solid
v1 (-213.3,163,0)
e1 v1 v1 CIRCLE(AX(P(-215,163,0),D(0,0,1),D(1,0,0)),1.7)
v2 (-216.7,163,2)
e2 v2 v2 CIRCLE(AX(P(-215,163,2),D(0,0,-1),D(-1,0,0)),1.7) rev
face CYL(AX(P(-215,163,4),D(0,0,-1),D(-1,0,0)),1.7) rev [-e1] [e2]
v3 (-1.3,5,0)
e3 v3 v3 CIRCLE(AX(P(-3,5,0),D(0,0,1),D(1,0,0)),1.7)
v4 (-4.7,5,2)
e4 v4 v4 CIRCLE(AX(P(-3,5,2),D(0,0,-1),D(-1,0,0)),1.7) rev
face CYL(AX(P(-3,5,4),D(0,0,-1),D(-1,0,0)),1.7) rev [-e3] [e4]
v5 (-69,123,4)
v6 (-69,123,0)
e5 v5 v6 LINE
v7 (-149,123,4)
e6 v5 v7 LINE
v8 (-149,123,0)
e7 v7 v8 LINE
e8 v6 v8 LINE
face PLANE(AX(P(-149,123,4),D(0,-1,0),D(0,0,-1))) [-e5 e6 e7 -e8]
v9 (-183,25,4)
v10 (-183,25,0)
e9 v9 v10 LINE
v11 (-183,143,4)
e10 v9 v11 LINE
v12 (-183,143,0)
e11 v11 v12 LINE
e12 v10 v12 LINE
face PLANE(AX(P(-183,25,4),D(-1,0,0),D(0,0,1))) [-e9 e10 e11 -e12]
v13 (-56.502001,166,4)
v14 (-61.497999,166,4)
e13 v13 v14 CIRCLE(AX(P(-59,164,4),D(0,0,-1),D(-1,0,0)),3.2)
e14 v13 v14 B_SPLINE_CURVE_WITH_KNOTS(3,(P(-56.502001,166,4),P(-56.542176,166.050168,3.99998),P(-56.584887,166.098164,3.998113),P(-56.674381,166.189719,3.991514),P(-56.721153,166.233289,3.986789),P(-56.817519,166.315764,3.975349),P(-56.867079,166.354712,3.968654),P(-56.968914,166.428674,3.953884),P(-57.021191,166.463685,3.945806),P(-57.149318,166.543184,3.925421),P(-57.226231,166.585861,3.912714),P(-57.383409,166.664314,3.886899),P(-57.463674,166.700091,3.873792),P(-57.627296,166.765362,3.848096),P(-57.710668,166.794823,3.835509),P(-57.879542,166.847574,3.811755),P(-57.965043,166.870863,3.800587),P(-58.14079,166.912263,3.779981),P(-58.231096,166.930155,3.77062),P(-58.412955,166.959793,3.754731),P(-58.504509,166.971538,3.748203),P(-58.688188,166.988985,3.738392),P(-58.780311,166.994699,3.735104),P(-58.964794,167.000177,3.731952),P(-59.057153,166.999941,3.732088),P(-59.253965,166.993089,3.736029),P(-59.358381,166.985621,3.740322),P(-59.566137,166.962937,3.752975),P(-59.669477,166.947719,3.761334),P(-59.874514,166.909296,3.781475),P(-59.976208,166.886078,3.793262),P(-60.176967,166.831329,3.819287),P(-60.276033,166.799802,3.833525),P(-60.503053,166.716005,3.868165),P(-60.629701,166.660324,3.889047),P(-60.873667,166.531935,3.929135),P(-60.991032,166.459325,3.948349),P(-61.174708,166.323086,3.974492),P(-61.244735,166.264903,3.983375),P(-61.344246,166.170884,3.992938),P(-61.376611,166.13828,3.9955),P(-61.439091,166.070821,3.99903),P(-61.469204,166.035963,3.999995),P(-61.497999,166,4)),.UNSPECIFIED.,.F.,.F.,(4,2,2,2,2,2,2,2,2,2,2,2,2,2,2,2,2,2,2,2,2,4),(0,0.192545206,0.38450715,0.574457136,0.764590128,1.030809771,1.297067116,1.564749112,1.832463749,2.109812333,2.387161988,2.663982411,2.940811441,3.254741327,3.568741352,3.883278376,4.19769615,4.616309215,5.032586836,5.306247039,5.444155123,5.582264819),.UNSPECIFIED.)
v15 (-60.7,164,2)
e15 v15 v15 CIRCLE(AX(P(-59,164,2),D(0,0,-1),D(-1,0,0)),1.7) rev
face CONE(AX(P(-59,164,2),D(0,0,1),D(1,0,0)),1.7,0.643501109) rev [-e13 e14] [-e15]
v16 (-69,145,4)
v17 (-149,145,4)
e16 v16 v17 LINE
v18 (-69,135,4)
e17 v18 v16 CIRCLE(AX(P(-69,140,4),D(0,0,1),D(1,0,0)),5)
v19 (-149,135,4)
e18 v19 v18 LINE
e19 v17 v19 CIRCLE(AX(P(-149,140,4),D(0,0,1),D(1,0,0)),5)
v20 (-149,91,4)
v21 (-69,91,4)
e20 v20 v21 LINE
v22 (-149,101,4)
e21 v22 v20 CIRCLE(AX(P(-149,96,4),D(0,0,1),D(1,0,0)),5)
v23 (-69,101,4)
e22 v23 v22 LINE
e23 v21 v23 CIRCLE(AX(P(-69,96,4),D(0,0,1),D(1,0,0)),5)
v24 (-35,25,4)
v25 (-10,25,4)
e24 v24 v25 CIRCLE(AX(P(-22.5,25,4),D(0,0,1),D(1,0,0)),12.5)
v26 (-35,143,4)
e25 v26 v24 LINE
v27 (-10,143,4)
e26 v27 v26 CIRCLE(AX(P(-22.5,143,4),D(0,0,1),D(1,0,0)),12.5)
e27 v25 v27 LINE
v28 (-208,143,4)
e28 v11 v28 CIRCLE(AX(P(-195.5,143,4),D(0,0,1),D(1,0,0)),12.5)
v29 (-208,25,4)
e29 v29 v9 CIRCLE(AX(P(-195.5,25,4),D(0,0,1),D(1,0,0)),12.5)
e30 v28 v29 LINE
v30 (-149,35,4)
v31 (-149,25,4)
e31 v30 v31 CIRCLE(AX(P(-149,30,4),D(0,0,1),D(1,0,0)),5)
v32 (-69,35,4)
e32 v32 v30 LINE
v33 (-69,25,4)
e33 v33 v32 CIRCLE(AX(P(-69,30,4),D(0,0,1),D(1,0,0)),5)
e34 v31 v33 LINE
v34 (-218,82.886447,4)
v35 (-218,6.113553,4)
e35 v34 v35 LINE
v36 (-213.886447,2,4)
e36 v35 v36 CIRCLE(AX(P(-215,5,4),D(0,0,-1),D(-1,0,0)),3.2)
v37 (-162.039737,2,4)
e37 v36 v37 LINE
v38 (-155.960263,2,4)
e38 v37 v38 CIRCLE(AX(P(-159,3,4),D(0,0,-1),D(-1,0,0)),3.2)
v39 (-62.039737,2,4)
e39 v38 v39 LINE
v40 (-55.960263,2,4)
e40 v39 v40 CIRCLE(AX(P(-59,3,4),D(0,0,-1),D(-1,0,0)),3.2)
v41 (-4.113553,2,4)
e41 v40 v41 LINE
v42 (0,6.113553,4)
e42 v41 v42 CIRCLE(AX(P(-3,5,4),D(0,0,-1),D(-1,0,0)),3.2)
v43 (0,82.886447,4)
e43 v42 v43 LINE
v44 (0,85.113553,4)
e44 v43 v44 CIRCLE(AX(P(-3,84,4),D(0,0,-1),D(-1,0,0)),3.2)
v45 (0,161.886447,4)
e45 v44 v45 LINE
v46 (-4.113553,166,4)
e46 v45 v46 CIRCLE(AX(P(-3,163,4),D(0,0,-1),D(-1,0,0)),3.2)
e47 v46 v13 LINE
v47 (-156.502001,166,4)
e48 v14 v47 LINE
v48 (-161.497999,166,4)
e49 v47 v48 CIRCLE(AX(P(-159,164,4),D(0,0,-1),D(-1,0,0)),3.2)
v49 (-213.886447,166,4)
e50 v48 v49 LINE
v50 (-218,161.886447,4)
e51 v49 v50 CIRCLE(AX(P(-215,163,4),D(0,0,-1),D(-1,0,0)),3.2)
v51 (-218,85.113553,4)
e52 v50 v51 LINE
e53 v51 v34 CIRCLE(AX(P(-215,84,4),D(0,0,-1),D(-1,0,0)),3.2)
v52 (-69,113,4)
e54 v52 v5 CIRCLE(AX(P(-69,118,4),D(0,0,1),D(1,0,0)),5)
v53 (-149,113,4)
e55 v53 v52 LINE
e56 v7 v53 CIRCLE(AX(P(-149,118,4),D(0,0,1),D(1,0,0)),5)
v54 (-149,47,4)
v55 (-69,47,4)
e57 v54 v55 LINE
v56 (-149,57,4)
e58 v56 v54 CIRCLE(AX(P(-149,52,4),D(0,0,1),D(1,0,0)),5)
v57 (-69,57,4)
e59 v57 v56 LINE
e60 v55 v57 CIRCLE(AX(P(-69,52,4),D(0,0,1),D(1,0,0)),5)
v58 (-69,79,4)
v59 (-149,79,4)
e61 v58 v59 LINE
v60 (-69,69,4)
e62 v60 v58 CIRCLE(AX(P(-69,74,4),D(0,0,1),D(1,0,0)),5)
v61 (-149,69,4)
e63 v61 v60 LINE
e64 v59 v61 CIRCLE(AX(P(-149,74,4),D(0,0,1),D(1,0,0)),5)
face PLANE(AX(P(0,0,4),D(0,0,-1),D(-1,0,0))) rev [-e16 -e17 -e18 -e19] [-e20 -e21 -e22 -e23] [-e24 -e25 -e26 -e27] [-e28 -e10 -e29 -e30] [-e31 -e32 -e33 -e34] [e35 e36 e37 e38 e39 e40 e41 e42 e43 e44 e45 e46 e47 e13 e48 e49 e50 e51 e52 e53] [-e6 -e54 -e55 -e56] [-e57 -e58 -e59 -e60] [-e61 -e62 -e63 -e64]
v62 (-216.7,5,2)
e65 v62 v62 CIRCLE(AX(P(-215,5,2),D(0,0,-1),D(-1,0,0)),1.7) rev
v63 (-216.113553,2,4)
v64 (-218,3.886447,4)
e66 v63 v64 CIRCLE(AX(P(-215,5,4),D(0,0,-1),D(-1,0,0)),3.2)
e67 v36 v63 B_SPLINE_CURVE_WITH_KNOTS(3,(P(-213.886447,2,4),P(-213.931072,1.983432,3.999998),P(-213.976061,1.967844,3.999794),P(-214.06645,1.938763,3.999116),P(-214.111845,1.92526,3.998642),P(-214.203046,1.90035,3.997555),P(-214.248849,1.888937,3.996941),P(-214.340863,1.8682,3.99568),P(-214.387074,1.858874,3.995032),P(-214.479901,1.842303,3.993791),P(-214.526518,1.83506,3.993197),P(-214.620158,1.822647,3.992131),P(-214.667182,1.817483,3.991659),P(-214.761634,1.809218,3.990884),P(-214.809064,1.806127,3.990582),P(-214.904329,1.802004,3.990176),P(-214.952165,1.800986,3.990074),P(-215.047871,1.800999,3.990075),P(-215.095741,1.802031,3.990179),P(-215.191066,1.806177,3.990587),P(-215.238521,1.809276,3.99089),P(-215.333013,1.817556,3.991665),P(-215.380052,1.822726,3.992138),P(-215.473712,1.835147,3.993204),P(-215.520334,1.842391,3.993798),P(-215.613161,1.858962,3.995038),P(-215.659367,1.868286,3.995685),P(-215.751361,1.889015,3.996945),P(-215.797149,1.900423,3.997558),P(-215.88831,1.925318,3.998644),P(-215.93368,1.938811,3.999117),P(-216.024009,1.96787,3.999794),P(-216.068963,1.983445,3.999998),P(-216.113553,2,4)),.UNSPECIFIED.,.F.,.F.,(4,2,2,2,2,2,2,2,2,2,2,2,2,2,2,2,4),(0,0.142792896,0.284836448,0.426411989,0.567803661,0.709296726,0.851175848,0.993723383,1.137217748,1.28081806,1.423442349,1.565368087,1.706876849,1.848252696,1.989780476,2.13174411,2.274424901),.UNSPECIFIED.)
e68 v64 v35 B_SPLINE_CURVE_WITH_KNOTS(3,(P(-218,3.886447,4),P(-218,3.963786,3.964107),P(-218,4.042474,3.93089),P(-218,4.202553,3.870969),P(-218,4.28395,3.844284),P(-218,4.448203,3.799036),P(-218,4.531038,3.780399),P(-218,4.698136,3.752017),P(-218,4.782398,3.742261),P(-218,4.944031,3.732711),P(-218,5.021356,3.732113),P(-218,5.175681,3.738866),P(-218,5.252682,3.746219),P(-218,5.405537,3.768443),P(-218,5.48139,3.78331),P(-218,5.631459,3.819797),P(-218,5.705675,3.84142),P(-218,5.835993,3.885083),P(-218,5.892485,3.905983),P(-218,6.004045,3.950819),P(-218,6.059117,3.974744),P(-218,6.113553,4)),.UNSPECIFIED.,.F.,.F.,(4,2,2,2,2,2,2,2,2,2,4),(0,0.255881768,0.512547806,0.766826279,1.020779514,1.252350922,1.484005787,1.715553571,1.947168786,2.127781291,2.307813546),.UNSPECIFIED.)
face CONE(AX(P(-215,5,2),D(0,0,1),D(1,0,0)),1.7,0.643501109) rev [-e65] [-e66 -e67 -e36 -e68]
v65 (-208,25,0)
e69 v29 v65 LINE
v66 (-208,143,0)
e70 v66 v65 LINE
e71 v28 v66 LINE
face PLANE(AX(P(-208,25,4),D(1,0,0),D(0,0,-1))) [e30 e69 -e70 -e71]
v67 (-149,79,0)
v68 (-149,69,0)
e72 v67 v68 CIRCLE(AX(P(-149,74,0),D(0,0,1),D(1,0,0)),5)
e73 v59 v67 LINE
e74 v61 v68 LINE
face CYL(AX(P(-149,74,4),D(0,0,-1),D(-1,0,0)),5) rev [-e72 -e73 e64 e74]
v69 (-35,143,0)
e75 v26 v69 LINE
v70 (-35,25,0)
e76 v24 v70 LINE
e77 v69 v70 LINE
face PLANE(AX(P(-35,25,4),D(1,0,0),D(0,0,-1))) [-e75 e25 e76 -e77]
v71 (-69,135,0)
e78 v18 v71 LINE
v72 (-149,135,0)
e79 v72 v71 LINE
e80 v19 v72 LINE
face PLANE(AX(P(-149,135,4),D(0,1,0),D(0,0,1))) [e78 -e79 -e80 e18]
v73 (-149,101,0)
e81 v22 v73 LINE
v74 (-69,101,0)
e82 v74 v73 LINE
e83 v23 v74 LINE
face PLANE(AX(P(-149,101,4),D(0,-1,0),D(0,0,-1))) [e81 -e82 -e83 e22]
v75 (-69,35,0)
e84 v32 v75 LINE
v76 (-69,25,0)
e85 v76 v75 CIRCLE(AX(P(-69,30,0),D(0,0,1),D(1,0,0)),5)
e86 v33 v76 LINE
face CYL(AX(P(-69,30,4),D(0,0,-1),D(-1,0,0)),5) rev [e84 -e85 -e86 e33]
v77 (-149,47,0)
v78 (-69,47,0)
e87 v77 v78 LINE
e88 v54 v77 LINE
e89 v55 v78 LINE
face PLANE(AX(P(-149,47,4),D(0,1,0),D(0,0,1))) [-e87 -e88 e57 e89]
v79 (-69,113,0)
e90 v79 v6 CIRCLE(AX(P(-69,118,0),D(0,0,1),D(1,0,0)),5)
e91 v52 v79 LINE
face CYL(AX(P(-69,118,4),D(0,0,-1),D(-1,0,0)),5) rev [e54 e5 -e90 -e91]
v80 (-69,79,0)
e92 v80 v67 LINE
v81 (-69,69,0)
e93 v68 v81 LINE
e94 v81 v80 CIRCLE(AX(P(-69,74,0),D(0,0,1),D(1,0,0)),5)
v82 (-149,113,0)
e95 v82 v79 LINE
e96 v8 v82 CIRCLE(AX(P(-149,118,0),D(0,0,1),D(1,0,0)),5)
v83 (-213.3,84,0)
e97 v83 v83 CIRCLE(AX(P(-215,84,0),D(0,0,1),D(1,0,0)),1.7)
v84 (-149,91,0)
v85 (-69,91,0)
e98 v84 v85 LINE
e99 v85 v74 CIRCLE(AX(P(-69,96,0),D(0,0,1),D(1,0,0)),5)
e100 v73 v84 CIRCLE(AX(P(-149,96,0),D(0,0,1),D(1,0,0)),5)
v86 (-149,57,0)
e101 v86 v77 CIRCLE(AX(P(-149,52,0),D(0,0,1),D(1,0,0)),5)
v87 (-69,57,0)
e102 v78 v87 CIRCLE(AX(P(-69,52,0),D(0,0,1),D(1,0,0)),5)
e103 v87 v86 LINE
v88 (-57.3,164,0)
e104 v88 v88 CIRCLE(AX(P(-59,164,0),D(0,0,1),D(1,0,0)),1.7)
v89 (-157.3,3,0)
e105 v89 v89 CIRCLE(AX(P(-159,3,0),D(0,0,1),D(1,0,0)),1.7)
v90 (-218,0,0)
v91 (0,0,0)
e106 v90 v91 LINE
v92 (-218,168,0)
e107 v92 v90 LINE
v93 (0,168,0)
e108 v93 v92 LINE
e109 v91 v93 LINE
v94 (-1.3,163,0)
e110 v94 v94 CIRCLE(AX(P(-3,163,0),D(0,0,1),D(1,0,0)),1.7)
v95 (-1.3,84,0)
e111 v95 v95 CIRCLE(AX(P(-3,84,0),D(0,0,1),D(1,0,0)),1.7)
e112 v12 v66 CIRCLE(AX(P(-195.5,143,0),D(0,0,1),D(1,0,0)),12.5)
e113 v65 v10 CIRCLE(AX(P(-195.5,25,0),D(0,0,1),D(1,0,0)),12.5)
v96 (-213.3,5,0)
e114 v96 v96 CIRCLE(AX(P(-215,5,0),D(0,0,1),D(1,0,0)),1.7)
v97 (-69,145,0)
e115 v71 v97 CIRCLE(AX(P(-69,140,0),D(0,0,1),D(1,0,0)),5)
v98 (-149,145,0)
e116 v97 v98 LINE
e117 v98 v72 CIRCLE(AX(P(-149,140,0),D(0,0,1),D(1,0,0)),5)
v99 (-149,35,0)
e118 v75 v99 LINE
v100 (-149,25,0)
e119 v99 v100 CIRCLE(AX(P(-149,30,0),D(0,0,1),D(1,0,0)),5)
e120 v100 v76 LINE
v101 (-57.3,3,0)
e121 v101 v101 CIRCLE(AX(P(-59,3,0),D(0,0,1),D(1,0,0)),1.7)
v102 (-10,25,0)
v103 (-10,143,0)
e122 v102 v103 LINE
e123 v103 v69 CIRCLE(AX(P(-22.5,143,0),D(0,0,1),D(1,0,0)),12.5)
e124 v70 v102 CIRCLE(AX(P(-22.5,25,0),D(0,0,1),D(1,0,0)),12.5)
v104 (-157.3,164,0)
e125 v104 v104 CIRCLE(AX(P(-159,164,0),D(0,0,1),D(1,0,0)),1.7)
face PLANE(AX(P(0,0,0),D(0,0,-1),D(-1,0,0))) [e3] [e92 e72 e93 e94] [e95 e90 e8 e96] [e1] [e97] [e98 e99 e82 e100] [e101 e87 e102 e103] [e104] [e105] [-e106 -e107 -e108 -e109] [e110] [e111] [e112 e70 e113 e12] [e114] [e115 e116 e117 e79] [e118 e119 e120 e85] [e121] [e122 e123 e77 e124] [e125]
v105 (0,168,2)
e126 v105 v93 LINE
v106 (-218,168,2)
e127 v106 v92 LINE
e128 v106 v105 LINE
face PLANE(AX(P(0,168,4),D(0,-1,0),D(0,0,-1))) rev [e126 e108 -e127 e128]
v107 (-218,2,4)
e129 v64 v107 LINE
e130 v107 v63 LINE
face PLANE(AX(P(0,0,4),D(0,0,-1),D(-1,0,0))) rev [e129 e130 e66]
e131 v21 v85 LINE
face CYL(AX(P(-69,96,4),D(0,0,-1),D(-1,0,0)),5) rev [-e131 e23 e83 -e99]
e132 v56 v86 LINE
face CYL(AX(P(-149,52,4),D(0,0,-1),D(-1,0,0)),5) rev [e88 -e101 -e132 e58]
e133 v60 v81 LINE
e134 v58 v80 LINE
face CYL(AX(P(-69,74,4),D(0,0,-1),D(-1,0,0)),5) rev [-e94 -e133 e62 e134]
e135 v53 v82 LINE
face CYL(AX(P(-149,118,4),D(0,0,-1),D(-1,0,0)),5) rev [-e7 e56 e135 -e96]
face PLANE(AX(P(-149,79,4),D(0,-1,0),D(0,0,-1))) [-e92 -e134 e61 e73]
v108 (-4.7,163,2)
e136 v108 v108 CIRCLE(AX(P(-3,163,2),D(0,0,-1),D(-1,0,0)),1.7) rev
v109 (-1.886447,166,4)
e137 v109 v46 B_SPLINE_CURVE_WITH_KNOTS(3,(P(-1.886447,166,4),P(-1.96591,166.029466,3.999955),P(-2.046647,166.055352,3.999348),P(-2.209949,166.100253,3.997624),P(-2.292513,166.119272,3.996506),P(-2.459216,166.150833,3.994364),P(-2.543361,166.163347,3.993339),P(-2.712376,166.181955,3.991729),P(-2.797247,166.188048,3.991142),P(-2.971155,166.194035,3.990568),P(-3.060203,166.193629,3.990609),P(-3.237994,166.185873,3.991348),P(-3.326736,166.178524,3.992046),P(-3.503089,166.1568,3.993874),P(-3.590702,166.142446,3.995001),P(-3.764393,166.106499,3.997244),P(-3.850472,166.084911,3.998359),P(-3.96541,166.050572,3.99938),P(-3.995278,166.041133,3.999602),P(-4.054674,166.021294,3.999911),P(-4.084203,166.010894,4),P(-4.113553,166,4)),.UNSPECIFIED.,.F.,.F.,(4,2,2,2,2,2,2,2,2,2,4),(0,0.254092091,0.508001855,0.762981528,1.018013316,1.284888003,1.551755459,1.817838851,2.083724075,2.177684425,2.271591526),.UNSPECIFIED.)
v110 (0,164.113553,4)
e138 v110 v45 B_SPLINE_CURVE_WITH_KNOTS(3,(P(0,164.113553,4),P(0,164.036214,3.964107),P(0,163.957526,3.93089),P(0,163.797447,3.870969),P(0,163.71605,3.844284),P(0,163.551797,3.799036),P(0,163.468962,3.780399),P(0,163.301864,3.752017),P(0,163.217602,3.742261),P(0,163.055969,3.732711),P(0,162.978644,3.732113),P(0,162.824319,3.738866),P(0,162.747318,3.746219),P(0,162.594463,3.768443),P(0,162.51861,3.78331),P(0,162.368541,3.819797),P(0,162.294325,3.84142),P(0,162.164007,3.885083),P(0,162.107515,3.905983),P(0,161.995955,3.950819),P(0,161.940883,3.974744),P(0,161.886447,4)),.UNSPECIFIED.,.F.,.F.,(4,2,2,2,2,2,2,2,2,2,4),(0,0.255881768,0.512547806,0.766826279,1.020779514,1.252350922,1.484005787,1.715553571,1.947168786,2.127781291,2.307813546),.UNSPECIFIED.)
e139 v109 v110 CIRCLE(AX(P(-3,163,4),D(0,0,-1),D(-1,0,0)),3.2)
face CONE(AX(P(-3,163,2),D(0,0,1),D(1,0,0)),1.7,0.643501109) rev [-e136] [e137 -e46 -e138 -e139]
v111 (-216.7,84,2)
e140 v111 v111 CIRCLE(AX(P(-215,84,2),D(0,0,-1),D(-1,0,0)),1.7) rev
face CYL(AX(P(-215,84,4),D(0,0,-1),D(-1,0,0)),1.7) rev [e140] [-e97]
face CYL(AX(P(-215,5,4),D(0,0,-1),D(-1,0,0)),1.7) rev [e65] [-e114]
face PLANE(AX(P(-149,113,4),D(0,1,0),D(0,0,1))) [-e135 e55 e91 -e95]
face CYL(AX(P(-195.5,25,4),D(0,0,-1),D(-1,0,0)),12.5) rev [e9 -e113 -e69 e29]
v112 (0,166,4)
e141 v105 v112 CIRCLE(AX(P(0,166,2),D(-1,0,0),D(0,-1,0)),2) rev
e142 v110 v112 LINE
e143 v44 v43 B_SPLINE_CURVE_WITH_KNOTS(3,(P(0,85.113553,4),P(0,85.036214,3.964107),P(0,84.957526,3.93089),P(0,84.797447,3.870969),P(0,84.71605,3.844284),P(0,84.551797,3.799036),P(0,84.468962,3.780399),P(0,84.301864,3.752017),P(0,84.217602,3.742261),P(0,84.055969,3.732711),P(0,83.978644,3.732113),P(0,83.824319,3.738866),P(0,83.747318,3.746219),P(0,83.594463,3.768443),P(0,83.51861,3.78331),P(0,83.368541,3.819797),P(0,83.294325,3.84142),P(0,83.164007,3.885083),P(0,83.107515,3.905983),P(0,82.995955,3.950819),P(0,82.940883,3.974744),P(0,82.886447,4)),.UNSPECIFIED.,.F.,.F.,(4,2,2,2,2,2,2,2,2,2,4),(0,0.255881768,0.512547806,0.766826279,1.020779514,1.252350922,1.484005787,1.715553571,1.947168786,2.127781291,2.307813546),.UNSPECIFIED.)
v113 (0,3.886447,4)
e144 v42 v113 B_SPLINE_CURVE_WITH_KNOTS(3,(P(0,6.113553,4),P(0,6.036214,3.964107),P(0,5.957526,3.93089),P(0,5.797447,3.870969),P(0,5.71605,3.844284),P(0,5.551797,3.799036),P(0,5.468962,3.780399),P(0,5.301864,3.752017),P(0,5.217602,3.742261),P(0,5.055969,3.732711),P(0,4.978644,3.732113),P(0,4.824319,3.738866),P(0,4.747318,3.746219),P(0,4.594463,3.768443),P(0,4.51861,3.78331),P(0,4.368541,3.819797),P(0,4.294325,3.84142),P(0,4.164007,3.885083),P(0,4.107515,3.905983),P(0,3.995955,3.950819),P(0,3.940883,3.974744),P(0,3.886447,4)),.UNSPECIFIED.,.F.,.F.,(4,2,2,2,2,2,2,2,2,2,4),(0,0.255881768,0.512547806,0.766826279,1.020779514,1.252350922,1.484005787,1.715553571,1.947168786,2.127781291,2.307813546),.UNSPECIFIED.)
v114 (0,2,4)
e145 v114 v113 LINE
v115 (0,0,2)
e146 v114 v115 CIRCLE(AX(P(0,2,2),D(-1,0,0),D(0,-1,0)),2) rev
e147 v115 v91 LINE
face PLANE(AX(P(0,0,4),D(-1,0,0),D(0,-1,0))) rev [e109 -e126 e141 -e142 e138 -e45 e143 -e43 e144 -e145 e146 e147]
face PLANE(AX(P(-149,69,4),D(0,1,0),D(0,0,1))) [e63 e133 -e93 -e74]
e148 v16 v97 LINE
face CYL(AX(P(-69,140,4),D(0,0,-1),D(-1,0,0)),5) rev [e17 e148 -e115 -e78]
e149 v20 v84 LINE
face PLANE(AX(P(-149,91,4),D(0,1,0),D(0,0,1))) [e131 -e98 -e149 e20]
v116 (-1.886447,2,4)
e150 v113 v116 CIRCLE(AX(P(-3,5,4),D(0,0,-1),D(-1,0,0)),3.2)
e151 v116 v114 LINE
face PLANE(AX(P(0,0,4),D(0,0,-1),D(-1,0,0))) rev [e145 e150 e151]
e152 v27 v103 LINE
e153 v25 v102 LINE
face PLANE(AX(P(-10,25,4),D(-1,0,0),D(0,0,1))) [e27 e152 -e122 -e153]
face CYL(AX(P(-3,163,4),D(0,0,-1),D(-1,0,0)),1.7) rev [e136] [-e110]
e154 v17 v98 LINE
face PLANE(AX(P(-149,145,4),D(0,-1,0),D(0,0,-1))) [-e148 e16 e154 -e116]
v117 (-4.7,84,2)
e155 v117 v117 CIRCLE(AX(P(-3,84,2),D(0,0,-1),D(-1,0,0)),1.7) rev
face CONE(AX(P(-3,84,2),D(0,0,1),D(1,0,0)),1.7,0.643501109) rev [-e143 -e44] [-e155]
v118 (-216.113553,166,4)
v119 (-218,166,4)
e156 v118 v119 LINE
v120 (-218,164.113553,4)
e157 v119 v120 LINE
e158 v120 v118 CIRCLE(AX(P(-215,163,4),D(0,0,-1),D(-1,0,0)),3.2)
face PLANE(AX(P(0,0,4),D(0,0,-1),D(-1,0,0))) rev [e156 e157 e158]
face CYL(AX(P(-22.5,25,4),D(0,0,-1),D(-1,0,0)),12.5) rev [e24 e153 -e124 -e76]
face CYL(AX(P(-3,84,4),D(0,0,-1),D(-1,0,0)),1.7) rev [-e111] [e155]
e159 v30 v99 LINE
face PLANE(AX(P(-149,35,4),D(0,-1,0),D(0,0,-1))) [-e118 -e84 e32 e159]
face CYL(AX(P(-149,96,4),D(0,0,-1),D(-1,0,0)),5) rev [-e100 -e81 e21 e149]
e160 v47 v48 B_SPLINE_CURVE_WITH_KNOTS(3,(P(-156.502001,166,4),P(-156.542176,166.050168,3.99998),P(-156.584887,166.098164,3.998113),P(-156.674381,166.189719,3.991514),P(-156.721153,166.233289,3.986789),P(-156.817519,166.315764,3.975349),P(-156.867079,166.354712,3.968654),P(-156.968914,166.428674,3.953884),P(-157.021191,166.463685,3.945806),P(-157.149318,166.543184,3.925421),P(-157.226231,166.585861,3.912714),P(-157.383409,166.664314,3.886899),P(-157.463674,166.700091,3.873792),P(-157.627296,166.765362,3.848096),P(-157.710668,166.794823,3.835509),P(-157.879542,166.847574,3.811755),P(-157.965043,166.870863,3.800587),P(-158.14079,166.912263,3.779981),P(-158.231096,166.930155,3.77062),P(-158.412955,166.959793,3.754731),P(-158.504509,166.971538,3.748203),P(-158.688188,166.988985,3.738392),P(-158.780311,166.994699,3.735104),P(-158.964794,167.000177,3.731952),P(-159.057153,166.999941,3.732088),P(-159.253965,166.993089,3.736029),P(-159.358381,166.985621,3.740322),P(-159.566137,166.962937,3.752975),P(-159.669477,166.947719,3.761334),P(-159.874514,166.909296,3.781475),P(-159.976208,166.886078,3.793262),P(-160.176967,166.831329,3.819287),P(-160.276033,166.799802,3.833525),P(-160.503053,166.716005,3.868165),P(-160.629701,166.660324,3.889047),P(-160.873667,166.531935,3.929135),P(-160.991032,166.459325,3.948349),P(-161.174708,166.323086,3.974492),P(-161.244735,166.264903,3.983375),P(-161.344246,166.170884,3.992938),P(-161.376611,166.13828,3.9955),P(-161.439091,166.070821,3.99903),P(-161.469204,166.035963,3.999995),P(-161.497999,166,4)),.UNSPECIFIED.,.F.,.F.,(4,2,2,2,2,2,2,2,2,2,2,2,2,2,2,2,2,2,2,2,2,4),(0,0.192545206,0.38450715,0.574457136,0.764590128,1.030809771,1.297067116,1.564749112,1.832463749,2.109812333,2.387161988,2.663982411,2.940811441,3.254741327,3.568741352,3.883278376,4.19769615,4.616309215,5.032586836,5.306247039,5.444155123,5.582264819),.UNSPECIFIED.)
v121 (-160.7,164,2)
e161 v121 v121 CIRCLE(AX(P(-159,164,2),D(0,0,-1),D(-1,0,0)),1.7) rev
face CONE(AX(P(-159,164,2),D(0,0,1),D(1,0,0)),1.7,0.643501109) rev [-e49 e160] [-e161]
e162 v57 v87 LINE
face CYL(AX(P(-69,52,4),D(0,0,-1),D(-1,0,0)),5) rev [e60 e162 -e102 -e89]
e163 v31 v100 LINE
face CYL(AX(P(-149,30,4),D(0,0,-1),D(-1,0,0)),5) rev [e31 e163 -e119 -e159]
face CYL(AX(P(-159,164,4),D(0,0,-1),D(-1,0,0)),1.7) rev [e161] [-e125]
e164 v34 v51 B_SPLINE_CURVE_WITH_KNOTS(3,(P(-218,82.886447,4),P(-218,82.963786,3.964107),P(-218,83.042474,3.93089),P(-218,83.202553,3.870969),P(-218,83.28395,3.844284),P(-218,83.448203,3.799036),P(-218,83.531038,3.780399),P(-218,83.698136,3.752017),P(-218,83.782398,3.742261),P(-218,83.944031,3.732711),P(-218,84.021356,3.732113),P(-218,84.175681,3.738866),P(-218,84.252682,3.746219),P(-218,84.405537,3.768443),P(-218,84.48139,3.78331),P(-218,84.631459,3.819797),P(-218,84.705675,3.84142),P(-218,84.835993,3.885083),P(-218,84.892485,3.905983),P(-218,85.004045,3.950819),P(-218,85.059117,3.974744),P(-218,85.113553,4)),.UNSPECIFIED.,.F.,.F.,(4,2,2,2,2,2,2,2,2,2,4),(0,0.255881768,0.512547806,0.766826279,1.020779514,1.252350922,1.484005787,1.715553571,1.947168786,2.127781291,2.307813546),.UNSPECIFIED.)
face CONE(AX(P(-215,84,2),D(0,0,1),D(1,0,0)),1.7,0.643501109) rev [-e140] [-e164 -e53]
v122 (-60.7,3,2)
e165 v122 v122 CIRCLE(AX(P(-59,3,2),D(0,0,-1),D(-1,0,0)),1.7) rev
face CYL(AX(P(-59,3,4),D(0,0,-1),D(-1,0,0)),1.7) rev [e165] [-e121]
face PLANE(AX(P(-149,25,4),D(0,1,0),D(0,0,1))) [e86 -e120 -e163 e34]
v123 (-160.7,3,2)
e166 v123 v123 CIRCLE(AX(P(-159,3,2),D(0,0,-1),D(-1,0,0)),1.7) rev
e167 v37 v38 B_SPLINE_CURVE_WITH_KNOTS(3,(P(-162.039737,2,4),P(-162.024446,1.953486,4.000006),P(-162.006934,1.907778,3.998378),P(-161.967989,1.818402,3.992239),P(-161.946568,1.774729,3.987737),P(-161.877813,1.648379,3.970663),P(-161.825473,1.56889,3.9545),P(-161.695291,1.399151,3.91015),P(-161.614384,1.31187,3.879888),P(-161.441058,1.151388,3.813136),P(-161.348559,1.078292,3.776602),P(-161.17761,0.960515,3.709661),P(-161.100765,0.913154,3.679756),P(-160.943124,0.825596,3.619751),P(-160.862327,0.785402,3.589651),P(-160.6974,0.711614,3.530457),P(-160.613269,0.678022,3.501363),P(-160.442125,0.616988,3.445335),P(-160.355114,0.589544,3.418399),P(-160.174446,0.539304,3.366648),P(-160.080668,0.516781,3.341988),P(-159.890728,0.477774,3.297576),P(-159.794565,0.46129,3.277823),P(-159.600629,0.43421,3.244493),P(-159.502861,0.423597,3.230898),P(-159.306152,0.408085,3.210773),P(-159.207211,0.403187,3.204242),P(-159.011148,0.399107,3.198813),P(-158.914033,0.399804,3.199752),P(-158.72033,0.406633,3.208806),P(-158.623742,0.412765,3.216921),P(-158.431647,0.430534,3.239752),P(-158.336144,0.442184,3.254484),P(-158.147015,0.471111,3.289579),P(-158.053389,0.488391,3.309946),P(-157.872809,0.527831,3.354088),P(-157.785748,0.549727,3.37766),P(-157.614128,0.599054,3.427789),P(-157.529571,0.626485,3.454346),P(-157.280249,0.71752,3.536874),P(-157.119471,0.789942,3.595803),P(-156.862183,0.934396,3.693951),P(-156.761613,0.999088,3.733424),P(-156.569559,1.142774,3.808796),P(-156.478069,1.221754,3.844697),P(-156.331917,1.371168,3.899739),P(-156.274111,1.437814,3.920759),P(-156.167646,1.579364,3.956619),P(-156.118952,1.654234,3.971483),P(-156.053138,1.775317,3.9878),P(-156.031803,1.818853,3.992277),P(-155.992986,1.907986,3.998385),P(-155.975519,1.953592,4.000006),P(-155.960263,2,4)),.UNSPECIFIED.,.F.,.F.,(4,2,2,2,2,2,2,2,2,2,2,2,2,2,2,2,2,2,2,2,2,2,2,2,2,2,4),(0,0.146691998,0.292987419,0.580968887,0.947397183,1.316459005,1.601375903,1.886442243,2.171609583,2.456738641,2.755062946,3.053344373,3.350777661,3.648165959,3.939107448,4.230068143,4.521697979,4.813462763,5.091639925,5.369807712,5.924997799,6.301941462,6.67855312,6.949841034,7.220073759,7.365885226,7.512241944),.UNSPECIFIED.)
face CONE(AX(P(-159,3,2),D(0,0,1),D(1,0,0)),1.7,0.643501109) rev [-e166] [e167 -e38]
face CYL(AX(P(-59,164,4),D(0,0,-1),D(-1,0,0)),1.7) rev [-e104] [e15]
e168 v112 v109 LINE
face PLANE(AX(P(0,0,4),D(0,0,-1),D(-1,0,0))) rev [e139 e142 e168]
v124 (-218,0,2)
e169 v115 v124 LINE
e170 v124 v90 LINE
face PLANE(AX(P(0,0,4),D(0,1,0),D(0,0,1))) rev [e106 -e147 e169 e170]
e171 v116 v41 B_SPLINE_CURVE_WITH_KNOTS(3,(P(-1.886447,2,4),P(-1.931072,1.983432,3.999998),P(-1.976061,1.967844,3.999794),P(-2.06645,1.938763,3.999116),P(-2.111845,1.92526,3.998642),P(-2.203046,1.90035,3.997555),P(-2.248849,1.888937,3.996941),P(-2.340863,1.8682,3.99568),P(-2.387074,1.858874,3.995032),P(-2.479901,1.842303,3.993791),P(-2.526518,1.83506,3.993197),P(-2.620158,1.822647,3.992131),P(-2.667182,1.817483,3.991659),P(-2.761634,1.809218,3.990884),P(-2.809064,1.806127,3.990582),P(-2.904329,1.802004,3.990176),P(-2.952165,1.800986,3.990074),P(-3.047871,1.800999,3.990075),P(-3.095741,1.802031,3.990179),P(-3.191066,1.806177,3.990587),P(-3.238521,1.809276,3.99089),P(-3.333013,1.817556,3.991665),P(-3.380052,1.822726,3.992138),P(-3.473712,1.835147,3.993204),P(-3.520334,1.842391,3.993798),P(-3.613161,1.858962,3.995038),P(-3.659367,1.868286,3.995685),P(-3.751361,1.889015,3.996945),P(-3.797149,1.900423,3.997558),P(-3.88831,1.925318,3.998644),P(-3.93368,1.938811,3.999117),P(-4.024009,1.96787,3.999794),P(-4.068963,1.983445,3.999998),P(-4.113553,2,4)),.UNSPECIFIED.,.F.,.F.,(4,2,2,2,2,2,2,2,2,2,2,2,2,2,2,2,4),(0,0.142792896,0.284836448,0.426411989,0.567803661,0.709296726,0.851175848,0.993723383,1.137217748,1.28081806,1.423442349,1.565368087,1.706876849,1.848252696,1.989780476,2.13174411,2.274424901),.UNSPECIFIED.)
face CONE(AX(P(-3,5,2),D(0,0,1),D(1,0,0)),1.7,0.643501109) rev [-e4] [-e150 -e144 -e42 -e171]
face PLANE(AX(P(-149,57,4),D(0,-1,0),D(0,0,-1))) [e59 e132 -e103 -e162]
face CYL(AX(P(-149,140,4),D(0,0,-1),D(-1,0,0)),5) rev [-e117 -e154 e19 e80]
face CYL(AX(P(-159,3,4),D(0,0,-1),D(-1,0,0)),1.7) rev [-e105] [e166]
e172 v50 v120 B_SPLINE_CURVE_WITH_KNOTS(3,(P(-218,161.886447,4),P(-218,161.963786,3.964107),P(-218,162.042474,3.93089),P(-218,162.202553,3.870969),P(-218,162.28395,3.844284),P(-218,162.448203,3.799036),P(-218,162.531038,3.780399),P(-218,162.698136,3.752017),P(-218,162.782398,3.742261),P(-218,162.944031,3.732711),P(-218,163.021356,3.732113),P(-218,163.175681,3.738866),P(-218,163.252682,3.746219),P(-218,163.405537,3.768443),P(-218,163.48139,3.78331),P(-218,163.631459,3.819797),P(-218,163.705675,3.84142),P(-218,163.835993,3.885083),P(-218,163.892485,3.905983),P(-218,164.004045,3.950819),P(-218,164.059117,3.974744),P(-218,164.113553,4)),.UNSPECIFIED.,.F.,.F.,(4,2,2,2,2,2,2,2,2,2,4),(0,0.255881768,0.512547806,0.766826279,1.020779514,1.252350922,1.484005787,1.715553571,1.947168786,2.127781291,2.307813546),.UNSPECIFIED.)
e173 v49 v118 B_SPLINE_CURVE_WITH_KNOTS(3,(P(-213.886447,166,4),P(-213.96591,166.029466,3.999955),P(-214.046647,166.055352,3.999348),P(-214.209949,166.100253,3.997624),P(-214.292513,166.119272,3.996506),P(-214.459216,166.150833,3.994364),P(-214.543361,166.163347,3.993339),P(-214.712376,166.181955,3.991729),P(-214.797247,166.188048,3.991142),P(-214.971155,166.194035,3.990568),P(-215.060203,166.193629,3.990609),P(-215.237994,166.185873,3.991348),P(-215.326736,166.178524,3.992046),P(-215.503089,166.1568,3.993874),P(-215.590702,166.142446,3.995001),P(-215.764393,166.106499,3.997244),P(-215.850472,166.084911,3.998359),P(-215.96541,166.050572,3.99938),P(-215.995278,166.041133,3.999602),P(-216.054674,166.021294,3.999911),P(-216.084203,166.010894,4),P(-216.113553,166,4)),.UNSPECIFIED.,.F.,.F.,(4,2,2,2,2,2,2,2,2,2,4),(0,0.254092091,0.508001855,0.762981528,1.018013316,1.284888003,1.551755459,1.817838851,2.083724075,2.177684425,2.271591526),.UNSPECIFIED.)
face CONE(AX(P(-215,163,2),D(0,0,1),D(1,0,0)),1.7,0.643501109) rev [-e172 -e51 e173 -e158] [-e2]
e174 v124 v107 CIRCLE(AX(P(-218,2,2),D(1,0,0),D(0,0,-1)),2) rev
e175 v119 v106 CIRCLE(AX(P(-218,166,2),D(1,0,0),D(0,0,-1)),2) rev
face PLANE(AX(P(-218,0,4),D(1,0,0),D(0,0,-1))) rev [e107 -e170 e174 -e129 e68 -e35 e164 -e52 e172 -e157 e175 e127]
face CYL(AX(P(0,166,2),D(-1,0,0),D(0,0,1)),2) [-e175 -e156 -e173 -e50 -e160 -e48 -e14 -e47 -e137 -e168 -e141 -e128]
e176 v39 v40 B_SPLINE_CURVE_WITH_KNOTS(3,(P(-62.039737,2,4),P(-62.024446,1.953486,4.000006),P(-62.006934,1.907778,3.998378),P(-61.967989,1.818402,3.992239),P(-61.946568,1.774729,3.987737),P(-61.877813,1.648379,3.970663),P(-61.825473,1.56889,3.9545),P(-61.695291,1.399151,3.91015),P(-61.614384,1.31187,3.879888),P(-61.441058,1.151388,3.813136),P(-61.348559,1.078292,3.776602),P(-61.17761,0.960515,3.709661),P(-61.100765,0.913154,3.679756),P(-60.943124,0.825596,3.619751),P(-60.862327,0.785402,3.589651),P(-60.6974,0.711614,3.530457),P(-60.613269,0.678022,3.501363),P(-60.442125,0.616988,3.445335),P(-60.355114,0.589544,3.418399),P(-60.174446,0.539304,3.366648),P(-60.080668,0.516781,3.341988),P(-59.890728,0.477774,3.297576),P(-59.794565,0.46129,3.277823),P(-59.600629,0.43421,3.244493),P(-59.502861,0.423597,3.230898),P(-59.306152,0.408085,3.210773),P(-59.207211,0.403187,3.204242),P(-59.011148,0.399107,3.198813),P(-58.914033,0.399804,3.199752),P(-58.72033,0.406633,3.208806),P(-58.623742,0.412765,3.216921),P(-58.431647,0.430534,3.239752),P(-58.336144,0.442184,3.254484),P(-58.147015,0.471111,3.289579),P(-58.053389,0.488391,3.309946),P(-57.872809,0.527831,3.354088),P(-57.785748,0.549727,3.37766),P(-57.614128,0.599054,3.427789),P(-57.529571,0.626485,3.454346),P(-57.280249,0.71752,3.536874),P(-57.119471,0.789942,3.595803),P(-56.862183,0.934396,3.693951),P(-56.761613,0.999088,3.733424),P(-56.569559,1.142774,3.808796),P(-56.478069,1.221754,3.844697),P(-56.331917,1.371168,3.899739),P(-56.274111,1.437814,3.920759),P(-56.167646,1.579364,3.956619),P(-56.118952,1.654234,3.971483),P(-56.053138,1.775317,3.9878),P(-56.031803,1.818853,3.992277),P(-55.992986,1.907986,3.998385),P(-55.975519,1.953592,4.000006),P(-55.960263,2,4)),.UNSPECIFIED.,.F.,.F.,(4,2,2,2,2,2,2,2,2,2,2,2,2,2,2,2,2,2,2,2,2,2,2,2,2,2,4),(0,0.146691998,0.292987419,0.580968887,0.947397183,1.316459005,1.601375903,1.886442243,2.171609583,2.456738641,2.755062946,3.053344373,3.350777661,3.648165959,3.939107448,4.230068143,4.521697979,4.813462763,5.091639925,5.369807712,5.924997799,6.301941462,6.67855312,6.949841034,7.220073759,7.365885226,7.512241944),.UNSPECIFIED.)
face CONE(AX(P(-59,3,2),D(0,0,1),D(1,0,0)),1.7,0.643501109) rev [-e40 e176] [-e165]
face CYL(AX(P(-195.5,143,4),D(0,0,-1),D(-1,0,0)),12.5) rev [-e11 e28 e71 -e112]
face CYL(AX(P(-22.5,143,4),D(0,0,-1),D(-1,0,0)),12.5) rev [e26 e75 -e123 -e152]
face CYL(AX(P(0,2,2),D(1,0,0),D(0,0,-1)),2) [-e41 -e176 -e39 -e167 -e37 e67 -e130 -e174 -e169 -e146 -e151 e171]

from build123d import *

# Parameters (mm, degrees)
SKETCH1_W           = 168
SKETCH1_H           = 218
SKETCH1_R           = 1.7
BOSS_EXTRUDE2_DEPTH = 4
CHAMFER1_SIZE       = 2
CHAMFER1_SIZE_2     = 1.5
FILLET1_R           = 2


with BuildPart() as part:
    # Sketch1 → Boss-Extrude2 (new body)
    with BuildSketch(Plane(origin=(0, 0, 0), x_dir=(0, 1, 0), z_dir=(0, 0, 1))):
        with Locations((84, 109)):
            Rectangle(SKETCH1_W, SKETCH1_H)
        with Locations(Location((5, 3, 0), (0, 0, 270))):
            Circle(SKETCH1_R, mode=Mode.SUBTRACT)
        with Locations(Location((5, 215, 0), (0, 0, 270))):
            Circle(SKETCH1_R, mode=Mode.SUBTRACT)
        with Locations(Location((163, 215, 0), (0, 0, 270))):
            Circle(SKETCH1_R, mode=Mode.SUBTRACT)
        with Locations(Location((163, 3, 0), (0, 0, 270))):
            Circle(SKETCH1_R, mode=Mode.SUBTRACT)
        with Locations(Location((84, 215, 0), (0, 0, 270))):
            Circle(SKETCH1_R, mode=Mode.SUBTRACT)
        with Locations(Location((84, 3, 0), (0, 0, 270))):
            Circle(SKETCH1_R, mode=Mode.SUBTRACT)
        with Locations(Location((3, 59, 0), (0, 0, 270))):
            Circle(SKETCH1_R, mode=Mode.SUBTRACT)
        with Locations(Location((164, 59, 0), (0, 0, 270))):
            Circle(SKETCH1_R, mode=Mode.SUBTRACT)
        with Locations(Location((164, 159, 0), (0, 0, 270))):
            Circle(SKETCH1_R, mode=Mode.SUBTRACT)
        with Locations(Location((3, 159, 0), (0, 0, 270))):
            Circle(SKETCH1_R, mode=Mode.SUBTRACT)
        with BuildLine():
            Line((35, 149), (35, 69))
            ThreePointArc((35, 69), (30, 64), (25, 69))
            Line((25, 69), (25, 149))
            ThreePointArc((25, 149), (30, 154), (35, 149))
        make_face(mode=Mode.SUBTRACT)
        with BuildLine():
            Line((57, 149), (57, 69))
            ThreePointArc((57, 69), (52, 64), (47, 69))
            Line((47, 69), (47, 149))
            ThreePointArc((47, 149), (52, 154), (57, 149))
        make_face(mode=Mode.SUBTRACT)
        with BuildLine():
            Line((79, 149), (79, 69))
            ThreePointArc((79, 69), (74, 64), (69, 69))
            Line((69, 69), (69, 149))
            ThreePointArc((69, 149), (74, 154), (79, 149))
        make_face(mode=Mode.SUBTRACT)
        with BuildLine():
            Line((101, 149), (101, 69))
            ThreePointArc((101, 69), (96, 64), (91, 69))
            Line((91, 69), (91, 149))
            ThreePointArc((91, 149), (96, 154), (101, 149))
        make_face(mode=Mode.SUBTRACT)
        with BuildLine():
            Line((123, 149), (123, 69))
            ThreePointArc((123, 69), (118, 64), (113, 69))
            Line((113, 69), (113, 149))
            ThreePointArc((113, 149), (118, 154), (123, 149))
        make_face(mode=Mode.SUBTRACT)
        with BuildLine():
            Line((145, 149), (145, 69))
            ThreePointArc((145, 69), (140, 64), (135, 69))
            Line((135, 69), (135, 149))
            ThreePointArc((135, 149), (140, 154), (145, 149))
        make_face(mode=Mode.SUBTRACT)
        with BuildLine():
            Line((25, 208), (143, 208))
            ThreePointArc((143, 208), (155.5, 195.5), (143, 183))
            Line((143, 183), (25, 183))
            ThreePointArc((25, 183), (12.5, 195.5), (25, 208))
        make_face(mode=Mode.SUBTRACT)
        with BuildLine():
            Line((25, 35), (143, 35))
            ThreePointArc((143, 35), (155.5, 22.5), (143, 10))
            Line((143, 10), (25, 10))
            ThreePointArc((25, 10), (12.5, 22.5), (25, 35))
        make_face(mode=Mode.SUBTRACT)
    extrude(amount=BOSS_EXTRUDE2_DEPTH)

    # Chamfer1
    # the kernel refuses this chamfer: 2, 1.5 mm, written as the material it takes off along each edge
    with BuildSketch(Plane(origin=(-3, 5, 4), x_dir=(1, 0, 0), z_dir=(0, -1, 0))) as chamfer1_piece_1:
        Polygon((1.7, -CHAMFER1_SIZE), (1.7 + CHAMFER1_SIZE_2, 0), (1.7, 0), align=None)
    revolve(axis=Axis((-3, 5, 4), (0, 0, 1)), mode=Mode.SUBTRACT)
    with BuildSketch(Plane(origin=(-59, 3, 4), x_dir=(1, 0, 0), z_dir=(0, -1, 0))) as chamfer1_piece_2:
        Polygon((1.7, -CHAMFER1_SIZE), (1.7 + CHAMFER1_SIZE_2, 0), (1.7, 0), align=None)
    revolve(axis=Axis((-59, 3, 4), (0, 0, 1)), mode=Mode.SUBTRACT)
    with BuildSketch(Plane(origin=(-59, 164, 4), x_dir=(1, 0, 0), z_dir=(0, -1, 0))) as chamfer1_piece_3:
        Polygon((1.7, -CHAMFER1_SIZE), (1.7 + CHAMFER1_SIZE_2, 0), (1.7, 0), align=None)
    revolve(axis=Axis((-59, 164, 4), (0, 0, 1)), mode=Mode.SUBTRACT)
    with BuildSketch(Plane(origin=(-159, 164, 4), x_dir=(1, 0, 0), z_dir=(0, -1, 0))) as chamfer1_piece_4:
        Polygon((1.7, -CHAMFER1_SIZE), (1.7 + CHAMFER1_SIZE_2, 0), (1.7, 0), align=None)
    revolve(axis=Axis((-159, 164, 4), (0, 0, 1)), mode=Mode.SUBTRACT)
    with BuildSketch(Plane(origin=(-159, 3, 4), x_dir=(1, 0, 0), z_dir=(0, -1, 0))) as chamfer1_piece_5:
        Polygon((1.7, -CHAMFER1_SIZE), (1.7 + CHAMFER1_SIZE_2, 0), (1.7, 0), align=None)
    revolve(axis=Axis((-159, 3, 4), (0, 0, 1)), mode=Mode.SUBTRACT)
    with BuildSketch(Plane(origin=(-215, 5, 4), x_dir=(1, 0, 0), z_dir=(0, -1, 0))) as chamfer1_piece_6:
        Polygon((1.7, -CHAMFER1_SIZE), (1.7 + CHAMFER1_SIZE_2, 0), (1.7, 0), align=None)
    revolve(axis=Axis((-215, 5, 4), (0, 0, 1)), mode=Mode.SUBTRACT)
    with BuildSketch(Plane(origin=(-215, 163, 4), x_dir=(1, 0, 0), z_dir=(0, -1, 0))) as chamfer1_piece_7:
        Polygon((1.7, -CHAMFER1_SIZE), (1.7 + CHAMFER1_SIZE_2, 0), (1.7, 0), align=None)
    revolve(axis=Axis((-215, 163, 4), (0, 0, 1)), mode=Mode.SUBTRACT)
    with BuildSketch(Plane(origin=(-3, 163, 4), x_dir=(1, 0, 0), z_dir=(0, -1, 0))) as chamfer1_piece_8:
        Polygon((1.7, -CHAMFER1_SIZE), (1.7 + CHAMFER1_SIZE_2, 0), (1.7, 0), align=None)
    revolve(axis=Axis((-3, 163, 4), (0, 0, 1)), mode=Mode.SUBTRACT)
    with BuildSketch(Plane(origin=(-215, 84, 4), x_dir=(1, 0, 0), z_dir=(0, -1, 0))) as chamfer1_piece_9:
        Polygon((1.7, -CHAMFER1_SIZE), (1.7 + CHAMFER1_SIZE_2, 0), (1.7, 0), align=None)
    revolve(axis=Axis((-215, 84, 4), (0, 0, 1)), mode=Mode.SUBTRACT)
    with BuildSketch(Plane(origin=(-3, 84, 4), x_dir=(1, 0, 0), z_dir=(0, -1, 0))) as chamfer1_piece_10:
        Polygon((1.7, -CHAMFER1_SIZE), (1.7 + CHAMFER1_SIZE_2, 0), (1.7, 0), align=None)
    revolve(axis=Axis((-3, 84, 4), (0, 0, 1)), mode=Mode.SUBTRACT)

    # Fillet1
    # the kernel refuses this fillet: 2 mm, written as the material it takes off along each edge
    with BuildSketch(Plane(origin=(5, 168, 4), x_dir=(0, 0, -1), z_dir=(-1, 0, 0))) as fillet1_piece_1:
        with BuildLine():
            CenterArc((FILLET1_R, FILLET1_R), FILLET1_R, 180, 90)
            Line((0, FILLET1_R), (0, 0))
            Line((0, 0), (FILLET1_R, 0))
        make_face()
    extrude(amount=228, mode=Mode.SUBTRACT)
    with BuildSketch(Plane(origin=(-162.886447127, 0, 4), x_dir=(0, 1, 0), z_dir=(1, 0, 0))) as fillet1_piece_2:
        with BuildLine():
            CenterArc((FILLET1_R, -FILLET1_R), FILLET1_R, 90, 90)
            Line((0, -FILLET1_R), (0, 0))
            Line((0, 0), (FILLET1_R, 0))
        make_face()
    extrude(amount=107.772894255, mode=Mode.SUBTRACT)
    with BuildSketch(Plane(origin=(-62.886447127, 0, 4), x_dir=(0, 1, 0), z_dir=(1, 0, 0)), Plane(origin=(-223, 0, 4), x_dir=(0, 1, 0), z_dir=(1, 0, 0))) as fillet1_piece_3:
        with BuildLine():
            CenterArc((FILLET1_R, -FILLET1_R), FILLET1_R, 90, 90)
            Line((0, -FILLET1_R), (0, 0))
            Line((0, 0), (FILLET1_R, 0))
        make_face()
    extrude(amount=67.886447127, mode=Mode.SUBTRACT)


solid = part.part
